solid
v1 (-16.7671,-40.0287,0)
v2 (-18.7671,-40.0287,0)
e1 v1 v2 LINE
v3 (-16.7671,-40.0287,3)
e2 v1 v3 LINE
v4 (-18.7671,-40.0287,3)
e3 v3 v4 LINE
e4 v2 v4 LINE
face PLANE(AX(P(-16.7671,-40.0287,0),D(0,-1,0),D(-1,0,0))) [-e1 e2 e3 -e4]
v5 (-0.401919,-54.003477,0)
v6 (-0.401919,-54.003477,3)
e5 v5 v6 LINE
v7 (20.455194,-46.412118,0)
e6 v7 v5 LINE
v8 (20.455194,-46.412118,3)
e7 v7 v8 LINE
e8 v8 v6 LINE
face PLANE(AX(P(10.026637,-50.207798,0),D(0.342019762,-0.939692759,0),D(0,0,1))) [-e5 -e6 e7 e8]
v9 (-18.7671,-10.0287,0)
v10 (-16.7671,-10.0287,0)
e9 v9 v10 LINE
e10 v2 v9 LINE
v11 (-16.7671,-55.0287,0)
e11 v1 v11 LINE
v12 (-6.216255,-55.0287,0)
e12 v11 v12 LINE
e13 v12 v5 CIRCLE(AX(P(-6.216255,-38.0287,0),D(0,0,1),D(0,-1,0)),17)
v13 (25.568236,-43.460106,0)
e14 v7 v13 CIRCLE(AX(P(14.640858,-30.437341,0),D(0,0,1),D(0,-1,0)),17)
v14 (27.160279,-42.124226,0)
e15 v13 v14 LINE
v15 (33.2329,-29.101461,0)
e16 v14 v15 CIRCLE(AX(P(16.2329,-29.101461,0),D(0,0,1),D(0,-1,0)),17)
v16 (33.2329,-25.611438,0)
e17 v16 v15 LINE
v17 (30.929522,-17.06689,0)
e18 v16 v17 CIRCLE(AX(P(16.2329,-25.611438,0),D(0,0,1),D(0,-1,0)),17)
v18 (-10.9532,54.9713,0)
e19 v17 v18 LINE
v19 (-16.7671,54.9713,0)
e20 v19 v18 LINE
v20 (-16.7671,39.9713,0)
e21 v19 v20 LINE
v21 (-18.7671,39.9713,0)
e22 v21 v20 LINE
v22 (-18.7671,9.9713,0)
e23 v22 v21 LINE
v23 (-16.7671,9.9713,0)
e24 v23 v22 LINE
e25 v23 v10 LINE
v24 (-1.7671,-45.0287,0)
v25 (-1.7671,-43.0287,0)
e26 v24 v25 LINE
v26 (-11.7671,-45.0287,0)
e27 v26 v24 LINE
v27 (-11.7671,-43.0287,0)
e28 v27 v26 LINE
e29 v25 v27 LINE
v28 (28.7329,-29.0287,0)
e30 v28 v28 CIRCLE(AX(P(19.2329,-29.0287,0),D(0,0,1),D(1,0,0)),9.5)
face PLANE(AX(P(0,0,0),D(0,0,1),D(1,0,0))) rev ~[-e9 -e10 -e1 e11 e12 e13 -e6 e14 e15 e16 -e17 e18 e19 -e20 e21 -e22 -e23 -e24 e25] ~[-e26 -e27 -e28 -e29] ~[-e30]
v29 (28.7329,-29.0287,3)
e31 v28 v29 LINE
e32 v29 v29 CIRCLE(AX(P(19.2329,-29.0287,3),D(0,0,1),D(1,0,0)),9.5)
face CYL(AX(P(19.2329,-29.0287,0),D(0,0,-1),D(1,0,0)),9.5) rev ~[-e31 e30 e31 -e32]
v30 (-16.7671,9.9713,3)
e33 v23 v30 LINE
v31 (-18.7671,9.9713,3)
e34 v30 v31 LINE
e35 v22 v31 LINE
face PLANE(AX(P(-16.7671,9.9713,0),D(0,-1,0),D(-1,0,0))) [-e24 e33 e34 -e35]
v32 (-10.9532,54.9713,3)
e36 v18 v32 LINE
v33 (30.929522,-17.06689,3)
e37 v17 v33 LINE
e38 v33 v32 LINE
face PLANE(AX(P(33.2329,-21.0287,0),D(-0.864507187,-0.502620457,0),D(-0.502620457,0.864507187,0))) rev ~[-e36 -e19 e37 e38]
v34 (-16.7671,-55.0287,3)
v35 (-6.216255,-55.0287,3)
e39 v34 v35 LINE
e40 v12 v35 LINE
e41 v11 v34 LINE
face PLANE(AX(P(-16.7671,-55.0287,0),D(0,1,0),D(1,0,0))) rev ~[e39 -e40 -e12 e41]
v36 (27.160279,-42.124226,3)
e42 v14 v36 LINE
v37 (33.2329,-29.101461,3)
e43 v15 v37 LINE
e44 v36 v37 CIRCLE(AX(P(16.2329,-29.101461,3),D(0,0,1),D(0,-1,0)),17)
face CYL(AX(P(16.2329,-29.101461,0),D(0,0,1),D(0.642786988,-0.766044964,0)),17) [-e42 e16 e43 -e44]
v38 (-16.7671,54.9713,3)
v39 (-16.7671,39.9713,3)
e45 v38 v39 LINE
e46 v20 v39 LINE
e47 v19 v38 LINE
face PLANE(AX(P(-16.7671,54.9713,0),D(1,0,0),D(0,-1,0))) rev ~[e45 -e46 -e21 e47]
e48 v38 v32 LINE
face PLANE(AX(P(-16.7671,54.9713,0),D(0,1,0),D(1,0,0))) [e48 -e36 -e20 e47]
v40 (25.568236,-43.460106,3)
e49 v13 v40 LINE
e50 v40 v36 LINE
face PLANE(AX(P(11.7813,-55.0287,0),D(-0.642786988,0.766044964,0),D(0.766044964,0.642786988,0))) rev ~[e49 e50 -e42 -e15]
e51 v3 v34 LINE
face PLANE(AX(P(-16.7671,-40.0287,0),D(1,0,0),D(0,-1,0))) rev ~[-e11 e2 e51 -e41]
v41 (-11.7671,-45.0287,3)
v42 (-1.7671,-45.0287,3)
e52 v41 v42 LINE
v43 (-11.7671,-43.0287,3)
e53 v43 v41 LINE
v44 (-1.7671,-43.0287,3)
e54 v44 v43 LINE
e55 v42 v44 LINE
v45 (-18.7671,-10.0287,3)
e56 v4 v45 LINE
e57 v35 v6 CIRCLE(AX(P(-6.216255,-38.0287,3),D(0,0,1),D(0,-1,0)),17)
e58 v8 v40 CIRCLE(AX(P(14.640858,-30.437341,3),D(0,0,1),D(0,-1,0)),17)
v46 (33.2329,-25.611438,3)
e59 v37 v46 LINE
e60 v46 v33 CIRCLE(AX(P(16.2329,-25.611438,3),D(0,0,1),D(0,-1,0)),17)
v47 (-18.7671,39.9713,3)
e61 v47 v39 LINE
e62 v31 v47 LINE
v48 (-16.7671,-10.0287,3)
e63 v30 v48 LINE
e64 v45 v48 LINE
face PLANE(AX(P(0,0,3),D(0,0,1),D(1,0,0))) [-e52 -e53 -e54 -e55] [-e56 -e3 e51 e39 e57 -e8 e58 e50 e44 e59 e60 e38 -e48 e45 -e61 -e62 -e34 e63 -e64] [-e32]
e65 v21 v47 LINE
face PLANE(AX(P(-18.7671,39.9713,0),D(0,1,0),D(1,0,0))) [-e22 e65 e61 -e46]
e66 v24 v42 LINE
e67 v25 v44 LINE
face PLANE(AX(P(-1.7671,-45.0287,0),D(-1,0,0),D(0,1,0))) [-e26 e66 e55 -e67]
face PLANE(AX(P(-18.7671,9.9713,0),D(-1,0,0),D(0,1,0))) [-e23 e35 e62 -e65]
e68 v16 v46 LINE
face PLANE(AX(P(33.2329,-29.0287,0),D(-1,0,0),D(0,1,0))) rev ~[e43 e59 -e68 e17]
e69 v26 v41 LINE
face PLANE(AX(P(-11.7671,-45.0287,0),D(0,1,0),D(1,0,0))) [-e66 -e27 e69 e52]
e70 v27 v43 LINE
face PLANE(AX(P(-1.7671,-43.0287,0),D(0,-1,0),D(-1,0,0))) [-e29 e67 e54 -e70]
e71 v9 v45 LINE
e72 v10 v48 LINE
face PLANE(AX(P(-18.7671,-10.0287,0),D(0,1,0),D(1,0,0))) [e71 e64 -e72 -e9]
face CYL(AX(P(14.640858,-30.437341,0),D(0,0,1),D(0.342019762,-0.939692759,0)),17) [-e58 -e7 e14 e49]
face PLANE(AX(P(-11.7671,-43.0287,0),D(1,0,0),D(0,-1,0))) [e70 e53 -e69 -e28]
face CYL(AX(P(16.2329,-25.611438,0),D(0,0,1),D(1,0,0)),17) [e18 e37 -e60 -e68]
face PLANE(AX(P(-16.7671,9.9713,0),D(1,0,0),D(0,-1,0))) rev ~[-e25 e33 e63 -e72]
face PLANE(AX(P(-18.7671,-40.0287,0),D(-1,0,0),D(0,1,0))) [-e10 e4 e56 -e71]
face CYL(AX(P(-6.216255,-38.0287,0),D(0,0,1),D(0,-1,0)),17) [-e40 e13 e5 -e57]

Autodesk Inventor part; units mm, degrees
ref_plane "YZ Plane" through (0, 0, 0) normal (1, 0, 0) x (0, 1, 0)
ref_plane "XZ Plane" through (0, 0, 0) normal (0, 1, 0) x (-1, 0, 0)
ref_plane "XY Plane" through (0, 0, 0) normal (0, 0, 1) x (1, 0, 0)
sketch "Sketch1" plane through (0, 0, 0) normal (0, 0, 1) x (1, 0, 0)
  line L0 (-16.7671, 64.9713) -> (-16.7671, -55.0287)
  line L1 (-16.7671, -55.0287) -> (11.7813, -55.0287)
  line L2 (11.7813, -55.0287) -> (33.2329, -37.0287)
  line L3 (33.2329, -37.0287) -> (33.2329, -21.0287)
  line L4 (33.2329, -21.0287) -> (-16.7671, 64.9713)
  line L5 (-1.7671, -43.0287) -> (-11.7671, -43.0287)
  line L6 (-11.7671, -43.0287) -> (-11.7671, -45.0287)
  line L7 (-11.7671, -45.0287) -> (-1.7671, -45.0287)
  line L8 (-1.7671, -45.0287) -> (-1.7671, -43.0287)
  line L9 (-16.7671, -40.0287) -> (-18.7671, -40.0287)
  line L10 (-18.7671, -40.0287) -> (-18.7671, -10.0287)
  line L11 (-18.7671, -10.0287) -> (-16.7671, -10.0287)
  line L12 (-16.7671, -10.0287) -> (-16.7671, -40.0287)
  line L13 (-16.7671, 9.9713) -> (-18.7671, 9.9713)
  line L14 (-18.7671, 9.9713) -> (-18.7671, 39.9713)
  line L15 (-18.7671, 39.9713) -> (-16.7671, 39.9713)
  line L16 (-16.7671, 39.9713) -> (-16.7671, 9.9713)
  line L17 (-16.7671, 54.9713) -> (-10.9532, 54.9713)
  circle A0 centre (19.2329, -29.0287) radius 9.5
  line L18 (19.2329, -29.0287) -> (33.2329, -29.0287)
  point P0 (0, 0)
  point P1 (-17.7671, -40.0287)
  point P2 (-17.7671, -10.0287)
  dimension "d0" = 120
  dimension "d1" = 10
  dimension "d2" = 2
  dimension "d3" = 10
  dimension "d4" = 5
  dimension "d5" = 2
  dimension "d6" = 30
  dimension "d7" = 15
  dimension "d8" = 2
  dimension "d9" = 30
  dimension "d10" = 20
  dimension "d11" = 18
  dimension "d12" = 16
  dimension "d13" = 50
  dimension "d14" = 10
  dimension "d15" = 50
  dimension "d16" = 19
  dimension "d17" = 36
  dimension "d18" = 90
extrude "Plate1" add sketch "Sketch1" along normal blind 3 contours L17 L4 L3 L2 L1 L0 | L0 L13 L14 L15 | L0 L9 L10 L11
chamfer "Corner Chamfer1" distance 15 angle 45 1 edges at (11.7813, -55.0287, 1.5)
fillet "Corner Round1" radius 17 4 edges at (33.2329, -37.0287, 1.5) (33.2329, -21.0287, 1.5) (23.272, -45.3869, 1.5) (-3.2187, -55.0287, 1.5)
equation "\"d2\" = d19"
equation "\"d5\" = d19"
equation "\"d8\" = d19"
equation "\"d21\" = Thickness"
equation "\"Thickness\" = plate_thickness"
equation "\"BendRadius\" = Thickness"
equation "\"BendReliefWidth\" = Thickness"
equation "\"BendReliefDepth\" = 0.5 * Thickness"
equation "\"CornerReliefSize\" = 4 * Thickness"
equation "\"MinimumRemnant\" = 2 * Thickness"
equation "\"TransitionRadius\" = BendRadius"
equation "\"JacobiRadiusSize\" = BendRadius"
equation "\"GapSize\" = Thickness"
equation "\"A_width\" = 46"
equation "\"A_joint_diameter\" = 16"
equation "\"A_joint_tolerance\" = 3"
equation "\"l___________\" = 0"
equation "\"l__________\" = 0"
equation "\"l_________\" = 0"
equation "\"rivet_diameter\" = 3.35"
equation "\"plate_thickness\" = 3"
equation "\"l________\" = 0"
equation "\"L_Piston_Top\" = 25"
equation "\"L_Piston_Bottom\" = 21"
equation "\"A_B_spacing\" = 2"
equation "\"thin_plate\" = 1.5"
equation "\"d19\" = 2"
properties part number "Piston_FloorHinge01" material "Stainless Steel"
